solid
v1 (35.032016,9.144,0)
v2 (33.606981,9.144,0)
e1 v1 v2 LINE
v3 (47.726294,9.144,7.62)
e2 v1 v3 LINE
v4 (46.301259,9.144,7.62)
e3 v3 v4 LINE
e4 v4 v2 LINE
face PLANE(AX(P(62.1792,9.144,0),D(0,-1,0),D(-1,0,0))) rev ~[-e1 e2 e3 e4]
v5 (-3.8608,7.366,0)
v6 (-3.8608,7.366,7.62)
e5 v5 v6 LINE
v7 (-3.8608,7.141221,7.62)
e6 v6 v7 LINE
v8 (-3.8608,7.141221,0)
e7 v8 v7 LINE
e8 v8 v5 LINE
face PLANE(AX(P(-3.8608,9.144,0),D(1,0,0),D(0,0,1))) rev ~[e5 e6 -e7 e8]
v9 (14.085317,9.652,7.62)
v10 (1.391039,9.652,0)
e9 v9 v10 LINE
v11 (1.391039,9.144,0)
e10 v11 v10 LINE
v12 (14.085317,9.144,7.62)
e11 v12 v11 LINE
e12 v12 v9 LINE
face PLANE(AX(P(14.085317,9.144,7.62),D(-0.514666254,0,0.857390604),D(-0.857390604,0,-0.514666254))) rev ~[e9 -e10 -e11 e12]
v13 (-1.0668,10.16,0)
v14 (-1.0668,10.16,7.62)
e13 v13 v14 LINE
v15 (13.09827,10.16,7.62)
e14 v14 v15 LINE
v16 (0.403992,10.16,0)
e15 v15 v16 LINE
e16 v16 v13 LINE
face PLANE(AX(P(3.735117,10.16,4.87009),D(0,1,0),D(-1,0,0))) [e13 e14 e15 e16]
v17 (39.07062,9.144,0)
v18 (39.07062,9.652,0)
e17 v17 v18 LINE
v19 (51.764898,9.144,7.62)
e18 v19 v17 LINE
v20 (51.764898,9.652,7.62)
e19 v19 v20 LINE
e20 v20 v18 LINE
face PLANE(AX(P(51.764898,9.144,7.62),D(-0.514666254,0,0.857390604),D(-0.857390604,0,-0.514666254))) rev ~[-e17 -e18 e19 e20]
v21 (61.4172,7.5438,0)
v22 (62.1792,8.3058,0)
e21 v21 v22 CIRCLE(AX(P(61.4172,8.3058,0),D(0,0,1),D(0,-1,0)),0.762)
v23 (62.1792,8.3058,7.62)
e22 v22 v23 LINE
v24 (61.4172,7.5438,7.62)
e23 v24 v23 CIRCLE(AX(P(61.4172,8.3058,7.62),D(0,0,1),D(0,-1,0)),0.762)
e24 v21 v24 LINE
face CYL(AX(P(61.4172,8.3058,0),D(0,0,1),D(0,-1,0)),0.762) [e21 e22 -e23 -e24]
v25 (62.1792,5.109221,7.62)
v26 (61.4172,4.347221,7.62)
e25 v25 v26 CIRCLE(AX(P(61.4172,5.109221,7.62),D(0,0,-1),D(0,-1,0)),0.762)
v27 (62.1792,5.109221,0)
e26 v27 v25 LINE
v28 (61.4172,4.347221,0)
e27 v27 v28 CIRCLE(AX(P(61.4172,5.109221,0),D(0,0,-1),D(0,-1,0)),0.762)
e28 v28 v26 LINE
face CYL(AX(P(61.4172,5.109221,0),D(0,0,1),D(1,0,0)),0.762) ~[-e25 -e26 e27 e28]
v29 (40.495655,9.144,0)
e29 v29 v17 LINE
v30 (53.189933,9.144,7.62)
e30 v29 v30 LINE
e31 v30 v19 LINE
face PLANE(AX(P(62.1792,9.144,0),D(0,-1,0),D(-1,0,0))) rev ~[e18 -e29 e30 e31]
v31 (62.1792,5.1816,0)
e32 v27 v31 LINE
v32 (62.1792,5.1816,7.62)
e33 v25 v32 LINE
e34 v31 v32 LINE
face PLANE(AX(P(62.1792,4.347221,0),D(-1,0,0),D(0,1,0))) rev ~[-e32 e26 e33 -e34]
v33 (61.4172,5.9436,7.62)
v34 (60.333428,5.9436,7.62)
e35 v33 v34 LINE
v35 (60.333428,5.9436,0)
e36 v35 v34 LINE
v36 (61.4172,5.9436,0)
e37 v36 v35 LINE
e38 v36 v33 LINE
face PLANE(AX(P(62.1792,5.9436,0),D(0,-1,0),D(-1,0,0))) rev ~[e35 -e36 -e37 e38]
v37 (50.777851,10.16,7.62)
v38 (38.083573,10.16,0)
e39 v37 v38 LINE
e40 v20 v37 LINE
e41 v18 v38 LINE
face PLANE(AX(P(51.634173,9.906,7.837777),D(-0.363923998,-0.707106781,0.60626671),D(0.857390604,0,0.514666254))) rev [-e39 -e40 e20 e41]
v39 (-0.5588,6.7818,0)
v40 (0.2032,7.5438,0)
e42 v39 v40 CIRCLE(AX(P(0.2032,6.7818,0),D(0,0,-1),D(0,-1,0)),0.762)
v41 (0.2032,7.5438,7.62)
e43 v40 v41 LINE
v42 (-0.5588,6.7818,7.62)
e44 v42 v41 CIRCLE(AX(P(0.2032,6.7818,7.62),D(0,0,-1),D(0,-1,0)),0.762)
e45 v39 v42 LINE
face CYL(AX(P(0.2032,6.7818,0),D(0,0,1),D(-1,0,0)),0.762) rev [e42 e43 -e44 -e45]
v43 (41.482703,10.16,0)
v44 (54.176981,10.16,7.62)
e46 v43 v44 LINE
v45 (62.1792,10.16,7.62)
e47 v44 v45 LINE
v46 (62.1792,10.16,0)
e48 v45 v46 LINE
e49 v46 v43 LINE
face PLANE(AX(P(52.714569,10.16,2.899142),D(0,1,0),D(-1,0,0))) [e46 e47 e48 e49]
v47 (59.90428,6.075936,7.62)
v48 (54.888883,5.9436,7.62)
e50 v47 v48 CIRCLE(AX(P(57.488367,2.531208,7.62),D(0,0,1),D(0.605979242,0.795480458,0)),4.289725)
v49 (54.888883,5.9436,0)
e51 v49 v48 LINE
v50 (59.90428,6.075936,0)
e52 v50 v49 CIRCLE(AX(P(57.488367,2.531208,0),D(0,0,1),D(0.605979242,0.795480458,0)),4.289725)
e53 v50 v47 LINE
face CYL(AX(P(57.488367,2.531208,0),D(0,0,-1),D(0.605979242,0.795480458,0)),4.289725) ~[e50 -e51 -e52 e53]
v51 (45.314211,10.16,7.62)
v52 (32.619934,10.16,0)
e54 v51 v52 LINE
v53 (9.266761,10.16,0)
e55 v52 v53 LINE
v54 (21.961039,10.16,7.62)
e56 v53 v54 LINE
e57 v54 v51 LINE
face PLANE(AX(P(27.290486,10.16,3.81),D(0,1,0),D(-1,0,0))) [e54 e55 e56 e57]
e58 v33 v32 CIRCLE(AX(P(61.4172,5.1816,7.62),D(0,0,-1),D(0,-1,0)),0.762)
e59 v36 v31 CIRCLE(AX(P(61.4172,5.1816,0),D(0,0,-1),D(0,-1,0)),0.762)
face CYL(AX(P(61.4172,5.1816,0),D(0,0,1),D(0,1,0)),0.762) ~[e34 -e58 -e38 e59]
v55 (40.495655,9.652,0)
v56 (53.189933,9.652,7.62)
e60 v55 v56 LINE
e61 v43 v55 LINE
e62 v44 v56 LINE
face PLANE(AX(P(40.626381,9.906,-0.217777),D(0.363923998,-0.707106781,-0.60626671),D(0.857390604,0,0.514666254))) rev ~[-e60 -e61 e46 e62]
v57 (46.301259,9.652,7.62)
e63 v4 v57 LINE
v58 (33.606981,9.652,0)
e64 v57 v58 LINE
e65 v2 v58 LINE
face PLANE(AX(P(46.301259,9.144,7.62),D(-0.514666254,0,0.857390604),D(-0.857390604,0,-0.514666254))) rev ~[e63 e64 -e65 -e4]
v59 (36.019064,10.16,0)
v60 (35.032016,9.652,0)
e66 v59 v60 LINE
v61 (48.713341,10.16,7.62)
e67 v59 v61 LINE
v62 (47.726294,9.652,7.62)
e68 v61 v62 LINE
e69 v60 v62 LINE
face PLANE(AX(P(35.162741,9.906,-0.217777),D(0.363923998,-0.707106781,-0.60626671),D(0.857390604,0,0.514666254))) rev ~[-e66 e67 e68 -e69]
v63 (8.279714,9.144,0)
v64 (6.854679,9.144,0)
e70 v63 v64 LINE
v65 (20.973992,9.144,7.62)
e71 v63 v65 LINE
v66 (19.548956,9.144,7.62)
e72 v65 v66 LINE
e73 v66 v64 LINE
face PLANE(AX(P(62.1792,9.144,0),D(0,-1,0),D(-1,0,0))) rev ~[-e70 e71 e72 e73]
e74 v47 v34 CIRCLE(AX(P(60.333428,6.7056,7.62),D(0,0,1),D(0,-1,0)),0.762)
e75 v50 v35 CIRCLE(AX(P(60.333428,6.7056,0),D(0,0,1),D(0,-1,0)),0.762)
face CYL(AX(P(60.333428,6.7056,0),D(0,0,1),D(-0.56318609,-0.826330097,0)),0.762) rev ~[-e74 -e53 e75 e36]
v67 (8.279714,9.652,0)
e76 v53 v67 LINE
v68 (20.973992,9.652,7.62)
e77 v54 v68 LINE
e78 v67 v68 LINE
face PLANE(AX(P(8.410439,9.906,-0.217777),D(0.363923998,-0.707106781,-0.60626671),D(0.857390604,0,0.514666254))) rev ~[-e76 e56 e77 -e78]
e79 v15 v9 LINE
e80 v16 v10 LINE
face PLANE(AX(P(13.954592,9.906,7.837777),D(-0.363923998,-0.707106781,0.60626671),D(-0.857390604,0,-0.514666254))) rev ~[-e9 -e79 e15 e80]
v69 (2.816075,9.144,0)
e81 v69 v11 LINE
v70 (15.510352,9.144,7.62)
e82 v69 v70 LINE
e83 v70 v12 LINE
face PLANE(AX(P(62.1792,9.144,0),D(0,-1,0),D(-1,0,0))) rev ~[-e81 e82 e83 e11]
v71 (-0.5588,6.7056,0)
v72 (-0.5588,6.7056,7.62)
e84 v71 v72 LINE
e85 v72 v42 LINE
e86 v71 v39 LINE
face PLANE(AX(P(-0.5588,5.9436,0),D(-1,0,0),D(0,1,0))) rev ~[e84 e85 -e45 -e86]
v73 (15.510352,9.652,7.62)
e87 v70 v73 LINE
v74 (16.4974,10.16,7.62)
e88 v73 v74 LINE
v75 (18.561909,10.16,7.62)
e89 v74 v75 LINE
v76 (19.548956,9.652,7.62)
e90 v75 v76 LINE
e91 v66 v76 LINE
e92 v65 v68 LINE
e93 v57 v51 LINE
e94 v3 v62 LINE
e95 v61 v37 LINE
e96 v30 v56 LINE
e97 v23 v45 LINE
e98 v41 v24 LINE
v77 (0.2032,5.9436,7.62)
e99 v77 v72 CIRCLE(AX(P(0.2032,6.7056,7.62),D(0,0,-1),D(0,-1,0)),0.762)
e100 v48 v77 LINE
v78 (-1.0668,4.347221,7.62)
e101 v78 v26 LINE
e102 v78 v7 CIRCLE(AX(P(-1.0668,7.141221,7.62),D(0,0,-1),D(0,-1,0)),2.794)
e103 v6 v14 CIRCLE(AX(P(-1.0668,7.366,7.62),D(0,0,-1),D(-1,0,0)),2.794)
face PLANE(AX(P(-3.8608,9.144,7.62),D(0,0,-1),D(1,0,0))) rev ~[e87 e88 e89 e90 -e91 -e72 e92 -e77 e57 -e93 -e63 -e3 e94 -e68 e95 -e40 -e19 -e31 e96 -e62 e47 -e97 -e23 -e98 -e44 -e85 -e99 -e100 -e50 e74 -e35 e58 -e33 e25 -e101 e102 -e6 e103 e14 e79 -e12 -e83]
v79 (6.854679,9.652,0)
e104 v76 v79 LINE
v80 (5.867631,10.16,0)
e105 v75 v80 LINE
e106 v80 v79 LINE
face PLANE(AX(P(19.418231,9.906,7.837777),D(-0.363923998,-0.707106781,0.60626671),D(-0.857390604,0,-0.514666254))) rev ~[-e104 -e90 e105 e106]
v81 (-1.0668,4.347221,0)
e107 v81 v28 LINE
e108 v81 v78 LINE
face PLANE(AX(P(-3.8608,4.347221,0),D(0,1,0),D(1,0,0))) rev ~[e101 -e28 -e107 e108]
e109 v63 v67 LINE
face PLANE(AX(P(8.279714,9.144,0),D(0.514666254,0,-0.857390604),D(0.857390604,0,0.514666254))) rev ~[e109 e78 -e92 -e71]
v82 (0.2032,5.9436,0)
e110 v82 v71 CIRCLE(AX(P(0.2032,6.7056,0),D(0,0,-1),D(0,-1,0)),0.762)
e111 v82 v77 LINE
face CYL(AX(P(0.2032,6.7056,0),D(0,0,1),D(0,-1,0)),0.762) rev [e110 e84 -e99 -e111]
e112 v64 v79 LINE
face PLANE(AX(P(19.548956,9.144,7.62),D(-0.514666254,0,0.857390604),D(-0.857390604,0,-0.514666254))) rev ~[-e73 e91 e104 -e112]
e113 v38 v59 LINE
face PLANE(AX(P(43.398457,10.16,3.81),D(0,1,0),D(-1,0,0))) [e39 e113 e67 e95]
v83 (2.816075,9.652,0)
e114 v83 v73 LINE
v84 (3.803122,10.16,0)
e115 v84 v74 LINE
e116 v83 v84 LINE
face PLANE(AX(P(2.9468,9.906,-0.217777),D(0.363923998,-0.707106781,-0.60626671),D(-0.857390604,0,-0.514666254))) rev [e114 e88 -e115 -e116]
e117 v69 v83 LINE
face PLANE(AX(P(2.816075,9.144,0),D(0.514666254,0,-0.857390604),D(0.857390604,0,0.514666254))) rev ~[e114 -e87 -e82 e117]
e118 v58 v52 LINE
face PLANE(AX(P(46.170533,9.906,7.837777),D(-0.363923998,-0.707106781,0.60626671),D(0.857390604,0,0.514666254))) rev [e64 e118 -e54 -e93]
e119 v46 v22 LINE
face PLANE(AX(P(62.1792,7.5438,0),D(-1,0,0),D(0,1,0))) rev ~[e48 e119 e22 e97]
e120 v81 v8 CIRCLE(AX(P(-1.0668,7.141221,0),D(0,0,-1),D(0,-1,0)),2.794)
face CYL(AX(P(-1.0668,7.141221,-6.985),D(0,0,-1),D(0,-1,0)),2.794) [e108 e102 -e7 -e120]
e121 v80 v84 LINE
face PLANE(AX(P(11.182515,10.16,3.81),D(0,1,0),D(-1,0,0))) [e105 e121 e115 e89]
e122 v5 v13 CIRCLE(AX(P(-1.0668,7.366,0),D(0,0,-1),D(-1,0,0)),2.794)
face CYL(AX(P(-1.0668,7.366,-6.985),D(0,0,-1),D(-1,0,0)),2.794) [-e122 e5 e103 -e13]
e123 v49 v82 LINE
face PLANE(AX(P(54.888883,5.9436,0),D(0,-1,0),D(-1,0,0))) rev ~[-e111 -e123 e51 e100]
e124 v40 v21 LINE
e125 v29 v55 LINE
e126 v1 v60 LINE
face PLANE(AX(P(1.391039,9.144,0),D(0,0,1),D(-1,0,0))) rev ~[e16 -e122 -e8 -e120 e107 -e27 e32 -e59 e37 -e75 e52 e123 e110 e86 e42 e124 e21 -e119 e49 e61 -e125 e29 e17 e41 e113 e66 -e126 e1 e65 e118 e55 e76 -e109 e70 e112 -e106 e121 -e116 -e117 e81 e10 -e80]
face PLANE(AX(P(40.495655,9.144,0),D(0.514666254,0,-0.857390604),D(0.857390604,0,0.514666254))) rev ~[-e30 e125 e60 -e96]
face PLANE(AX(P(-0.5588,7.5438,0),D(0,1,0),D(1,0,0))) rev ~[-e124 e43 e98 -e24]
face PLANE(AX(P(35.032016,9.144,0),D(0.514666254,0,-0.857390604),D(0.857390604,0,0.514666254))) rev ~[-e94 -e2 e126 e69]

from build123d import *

# Parameters (mm, degrees)
F1_DEPTH    = 7.62
F3_DEPTH    = 1.016
F4_T1_DEPTH = 21.59
F5_R        = 0.762
F6_R        = 0.762
F7_SIZE     = 0.508


# Not quite as in the source:
# - a fillet or chamfer that OpenCascade refuses, or shapes differently, is made with other operations: its cross-section is extruded or revolved along the edge and cut away or added


with BuildPart() as f1:
    # F0 (on Top) → F1 (new body)
    with BuildSketch(Plane.XY):
        with BuildLine():
            Line((62.1792, 9.144), (-3.8608, 9.144))
            Line((-3.8608, 9.144), (-3.8608, 4.3472210688))
            Line((-3.8608, 4.3472210688), (62.1792, 4.3472210688))
            Line((62.1792, 4.3472210688), (62.1792, 5.9436))
            Line((62.1792, 5.9436), (60.087851236, 5.9436))
            ThreePointArc((60.087851236, 5.9436), (57.4883669615, 6.8209325844), (54.888882687, 5.9436))
            Line((54.888882687, 5.9436), (-0.5588, 5.9436))
            Line((-0.5588, 5.9436), (-0.5588, 7.5438))
            Line((-0.5588, 7.5438), (62.1792, 7.5438))
            Line((62.1792, 7.5438), (62.1792, 9.144))
        make_face()
    extrude(amount=F1_DEPTH)

    # F2 (on face) → F3 (join)
    with BuildSketch(Plane(origin=(0, 9.144, 0), x_dir=(-1, 0, 0), z_dir=(0, 1, 0))):
        Polygon((-14.0853170305, 7.62), (-1.3910392299, 0), (3.8608, 0), (3.8608, 7.62), align=None)
        Polygon((-19.5489563048, 7.62), (-6.8546785042, 0), (-2.8160745278, 0), (-15.5103523284, 7.62), align=None)
        Polygon((-33.6069809273, 0), (-8.279713802, 0), (-20.9739916027, 7.62), (-46.3012587279, 7.62), align=None)
        Polygon((-39.0706202015, 0), (-35.0320162252, 0), (-47.7262940258, 7.62), (-51.7648980021, 7.62), align=None)
        Polygon((-62.1792, 0), (-40.4956554994, 0), (-53.1899333, 7.62), (-62.1792, 7.62), align=None)
    extrude(amount=F3_DEPTH)

    # F4: fillet of radius 2.794 on 3 edges, made by hand

    # F4_s2 → F4_t1 (cut)
    with BuildSketch(Plane.XY.offset(-6.985)):
        with BuildLine():
            ThreePointArc((-1.0668, 4.3472210688), (-3.0424563466, 5.1655647222), (-3.8608, 7.1412210688))
            Line((-3.8608, 7.1412210688), (-3.8608, 4.3472210688))
            Line((-3.8608, 4.3472210688), (-1.0668, 4.3472210688))
        make_face()
        with BuildLine():
            ThreePointArc((-3.8608, 7.366), (-3.0424563466, 9.3416563466), (-1.0668, 10.16))
            Line((-1.0668, 10.16), (-3.8608, 10.16))
            Line((-3.8608, 10.16), (-3.8608, 7.366))
        make_face()
    extrude(amount=F4_T1_DEPTH, mode=Mode.SUBTRACT)

    # F5
    f5_edges = [f1.edges().sort_by_distance(p)[0] for p in [
        (-0.5588, 5.9436, 3.81),
        (-0.5588, 7.5438, 3.81),
    ]]
    fillet(f5_edges, radius=F5_R)

    # F6
    f6_edges = [f1.edges().sort_by_distance(p)[0] for p in [
        (62.1792, 7.5438, 3.81),
        (60.087851, 5.9436, 3.81),
        (62.1792, 5.9436, 3.81),
        (62.1792, 4.347221, 3.81),
    ]]
    fillet(f6_edges, radius=F6_R)

    # F7
    f7_edges = [f1.edges().sort_by_distance(p)[0] for p in [
        (7.738178, 10.16, 3.81),
        (9.163213, 10.16, 3.81),
        (13.201817, 10.16, 3.81),
        (14.626853, 10.16, 3.81),
        (39.95412, 10.16, 3.81),
        (41.379155, 10.16, 3.81),
        (45.417759, 10.16, 3.81),
        (46.842794, 10.16, 3.81),
    ]]
    chamfer(f7_edges, length=F7_SIZE)


solid = f1.part
